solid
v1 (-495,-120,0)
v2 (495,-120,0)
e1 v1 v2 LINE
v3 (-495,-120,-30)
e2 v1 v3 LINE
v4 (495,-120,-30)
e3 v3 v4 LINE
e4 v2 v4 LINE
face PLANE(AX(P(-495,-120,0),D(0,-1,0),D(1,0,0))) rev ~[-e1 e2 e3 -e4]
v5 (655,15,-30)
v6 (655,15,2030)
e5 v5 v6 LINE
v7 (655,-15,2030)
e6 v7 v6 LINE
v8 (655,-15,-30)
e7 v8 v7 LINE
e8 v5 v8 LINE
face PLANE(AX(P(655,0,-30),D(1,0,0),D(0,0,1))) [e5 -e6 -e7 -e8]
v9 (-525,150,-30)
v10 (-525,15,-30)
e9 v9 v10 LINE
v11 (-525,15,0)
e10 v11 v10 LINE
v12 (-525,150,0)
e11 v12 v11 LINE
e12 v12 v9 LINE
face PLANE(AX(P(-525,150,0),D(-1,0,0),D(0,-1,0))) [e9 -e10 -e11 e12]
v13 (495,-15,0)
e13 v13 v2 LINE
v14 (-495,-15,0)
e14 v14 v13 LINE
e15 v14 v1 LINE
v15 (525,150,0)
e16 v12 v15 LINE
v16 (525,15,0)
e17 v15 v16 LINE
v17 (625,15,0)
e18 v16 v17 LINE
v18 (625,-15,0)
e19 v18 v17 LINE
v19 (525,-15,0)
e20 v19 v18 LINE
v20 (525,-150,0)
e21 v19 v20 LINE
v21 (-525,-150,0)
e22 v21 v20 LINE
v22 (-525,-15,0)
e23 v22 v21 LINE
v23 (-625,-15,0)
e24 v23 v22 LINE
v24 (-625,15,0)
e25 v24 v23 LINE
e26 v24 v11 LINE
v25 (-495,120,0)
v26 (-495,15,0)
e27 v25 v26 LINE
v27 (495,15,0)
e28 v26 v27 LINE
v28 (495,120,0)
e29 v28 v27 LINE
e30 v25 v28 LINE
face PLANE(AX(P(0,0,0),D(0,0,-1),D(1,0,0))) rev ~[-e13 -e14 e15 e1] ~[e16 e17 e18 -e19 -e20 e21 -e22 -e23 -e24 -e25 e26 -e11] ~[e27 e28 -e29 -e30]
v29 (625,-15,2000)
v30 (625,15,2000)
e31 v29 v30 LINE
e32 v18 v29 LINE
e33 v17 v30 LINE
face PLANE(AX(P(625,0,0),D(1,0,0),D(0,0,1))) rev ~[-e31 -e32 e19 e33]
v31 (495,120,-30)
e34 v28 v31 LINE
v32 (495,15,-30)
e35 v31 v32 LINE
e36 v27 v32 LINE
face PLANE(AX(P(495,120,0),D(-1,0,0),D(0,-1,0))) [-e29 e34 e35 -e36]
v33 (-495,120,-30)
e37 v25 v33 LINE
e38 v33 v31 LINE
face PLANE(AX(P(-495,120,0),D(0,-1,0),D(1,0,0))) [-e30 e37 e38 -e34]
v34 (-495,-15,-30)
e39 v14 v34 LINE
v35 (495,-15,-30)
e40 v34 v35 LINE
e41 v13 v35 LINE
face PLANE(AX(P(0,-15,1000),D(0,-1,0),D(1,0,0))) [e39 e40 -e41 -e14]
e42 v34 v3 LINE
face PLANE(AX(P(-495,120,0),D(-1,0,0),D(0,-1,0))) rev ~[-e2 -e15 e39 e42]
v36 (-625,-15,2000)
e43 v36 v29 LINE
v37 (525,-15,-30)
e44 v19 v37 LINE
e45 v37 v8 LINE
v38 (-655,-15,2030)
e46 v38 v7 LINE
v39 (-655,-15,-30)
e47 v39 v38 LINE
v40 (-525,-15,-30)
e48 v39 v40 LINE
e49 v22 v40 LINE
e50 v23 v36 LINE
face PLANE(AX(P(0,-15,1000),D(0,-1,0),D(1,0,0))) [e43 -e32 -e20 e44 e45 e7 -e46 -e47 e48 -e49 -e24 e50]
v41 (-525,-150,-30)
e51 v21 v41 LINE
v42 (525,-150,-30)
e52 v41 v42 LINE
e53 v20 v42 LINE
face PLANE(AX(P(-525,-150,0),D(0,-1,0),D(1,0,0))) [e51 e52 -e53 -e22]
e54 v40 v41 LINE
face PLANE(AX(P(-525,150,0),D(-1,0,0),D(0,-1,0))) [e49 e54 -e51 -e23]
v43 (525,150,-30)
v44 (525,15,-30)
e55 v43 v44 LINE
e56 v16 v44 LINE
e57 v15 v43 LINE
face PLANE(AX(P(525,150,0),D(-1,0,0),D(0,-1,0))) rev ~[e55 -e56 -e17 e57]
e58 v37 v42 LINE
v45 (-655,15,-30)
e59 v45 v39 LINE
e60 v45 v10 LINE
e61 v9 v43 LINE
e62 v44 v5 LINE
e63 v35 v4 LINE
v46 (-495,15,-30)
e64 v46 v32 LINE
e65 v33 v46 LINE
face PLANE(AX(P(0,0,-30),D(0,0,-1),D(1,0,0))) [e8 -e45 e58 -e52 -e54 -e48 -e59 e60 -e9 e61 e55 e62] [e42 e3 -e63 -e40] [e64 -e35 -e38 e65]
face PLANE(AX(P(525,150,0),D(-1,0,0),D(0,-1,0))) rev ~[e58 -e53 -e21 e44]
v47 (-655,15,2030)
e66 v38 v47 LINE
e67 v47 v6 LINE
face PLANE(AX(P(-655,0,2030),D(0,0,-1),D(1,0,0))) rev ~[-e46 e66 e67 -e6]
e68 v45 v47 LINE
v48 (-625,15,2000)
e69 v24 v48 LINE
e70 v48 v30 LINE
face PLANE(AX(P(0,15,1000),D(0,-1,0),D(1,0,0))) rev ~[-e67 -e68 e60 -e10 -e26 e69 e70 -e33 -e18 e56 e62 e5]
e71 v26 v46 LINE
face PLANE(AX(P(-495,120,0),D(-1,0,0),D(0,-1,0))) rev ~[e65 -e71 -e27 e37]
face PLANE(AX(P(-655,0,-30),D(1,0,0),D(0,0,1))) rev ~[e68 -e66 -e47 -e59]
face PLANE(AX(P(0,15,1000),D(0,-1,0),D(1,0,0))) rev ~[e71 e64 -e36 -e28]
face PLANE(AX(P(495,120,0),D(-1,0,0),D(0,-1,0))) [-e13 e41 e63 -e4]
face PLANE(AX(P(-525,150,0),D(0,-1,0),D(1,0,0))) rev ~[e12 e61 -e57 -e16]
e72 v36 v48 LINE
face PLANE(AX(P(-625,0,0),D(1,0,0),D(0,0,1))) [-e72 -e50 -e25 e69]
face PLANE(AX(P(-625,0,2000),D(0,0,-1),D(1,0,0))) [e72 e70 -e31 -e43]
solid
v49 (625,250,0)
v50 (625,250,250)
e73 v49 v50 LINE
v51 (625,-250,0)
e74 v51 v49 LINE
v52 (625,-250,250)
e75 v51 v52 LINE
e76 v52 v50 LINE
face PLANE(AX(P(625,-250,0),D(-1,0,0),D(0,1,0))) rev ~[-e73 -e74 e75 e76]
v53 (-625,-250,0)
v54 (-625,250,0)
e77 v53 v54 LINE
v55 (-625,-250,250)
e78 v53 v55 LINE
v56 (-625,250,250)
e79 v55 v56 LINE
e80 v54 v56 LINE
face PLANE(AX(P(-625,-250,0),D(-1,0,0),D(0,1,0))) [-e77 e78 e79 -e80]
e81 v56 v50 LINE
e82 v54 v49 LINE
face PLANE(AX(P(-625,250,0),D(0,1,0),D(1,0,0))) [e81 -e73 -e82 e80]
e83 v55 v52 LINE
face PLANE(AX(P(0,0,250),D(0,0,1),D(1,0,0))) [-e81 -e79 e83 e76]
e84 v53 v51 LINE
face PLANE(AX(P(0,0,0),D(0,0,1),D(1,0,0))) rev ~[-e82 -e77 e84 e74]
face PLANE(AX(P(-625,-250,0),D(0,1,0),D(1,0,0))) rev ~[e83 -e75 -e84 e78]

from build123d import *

# Parameters (mm, degrees)
F0_W     = 1250
F0_H     = 500
F1_DEPTH = 250
F2_W     = 1310
F2_H     = 2060
F2_W_2   = 1250
F2_H_2   = 2000
F3_DEPTH = 15
F4_W     = 1050
F4_H     = 300
F4_W_2   = 990
F4_H_2   = 240
F5_DEPTH = 30


with BuildPart() as f1:
    # F0 (on Top) → F1 (new body)
    with BuildSketch(Plane.XY):
        Rectangle(F0_W, F0_H)
    extrude(amount=F1_DEPTH)


with BuildPart() as f3:
    # F2 (on Front) → F3 (new body, symmetric)
    with BuildSketch(Plane.XZ):
        with Locations((0, 1000)):
            Rectangle(F2_W, F2_H)
        with Locations((0, 1000)):
            Rectangle(F2_W_2, F2_H_2, mode=Mode.SUBTRACT)
    extrude(amount=F3_DEPTH, both=True)

    # F4 (on face) → F5 (join)
    with BuildSketch(Plane(origin=(0, 0, 0), x_dir=(1, 0, 0), z_dir=(0, 0, -1))):
        Rectangle(F4_W, F4_H)
        Rectangle(F4_W_2, F4_H_2, mode=Mode.SUBTRACT)
    extrude(amount=F5_DEPTH)


solid = Compound([f1.part, f3.part])
